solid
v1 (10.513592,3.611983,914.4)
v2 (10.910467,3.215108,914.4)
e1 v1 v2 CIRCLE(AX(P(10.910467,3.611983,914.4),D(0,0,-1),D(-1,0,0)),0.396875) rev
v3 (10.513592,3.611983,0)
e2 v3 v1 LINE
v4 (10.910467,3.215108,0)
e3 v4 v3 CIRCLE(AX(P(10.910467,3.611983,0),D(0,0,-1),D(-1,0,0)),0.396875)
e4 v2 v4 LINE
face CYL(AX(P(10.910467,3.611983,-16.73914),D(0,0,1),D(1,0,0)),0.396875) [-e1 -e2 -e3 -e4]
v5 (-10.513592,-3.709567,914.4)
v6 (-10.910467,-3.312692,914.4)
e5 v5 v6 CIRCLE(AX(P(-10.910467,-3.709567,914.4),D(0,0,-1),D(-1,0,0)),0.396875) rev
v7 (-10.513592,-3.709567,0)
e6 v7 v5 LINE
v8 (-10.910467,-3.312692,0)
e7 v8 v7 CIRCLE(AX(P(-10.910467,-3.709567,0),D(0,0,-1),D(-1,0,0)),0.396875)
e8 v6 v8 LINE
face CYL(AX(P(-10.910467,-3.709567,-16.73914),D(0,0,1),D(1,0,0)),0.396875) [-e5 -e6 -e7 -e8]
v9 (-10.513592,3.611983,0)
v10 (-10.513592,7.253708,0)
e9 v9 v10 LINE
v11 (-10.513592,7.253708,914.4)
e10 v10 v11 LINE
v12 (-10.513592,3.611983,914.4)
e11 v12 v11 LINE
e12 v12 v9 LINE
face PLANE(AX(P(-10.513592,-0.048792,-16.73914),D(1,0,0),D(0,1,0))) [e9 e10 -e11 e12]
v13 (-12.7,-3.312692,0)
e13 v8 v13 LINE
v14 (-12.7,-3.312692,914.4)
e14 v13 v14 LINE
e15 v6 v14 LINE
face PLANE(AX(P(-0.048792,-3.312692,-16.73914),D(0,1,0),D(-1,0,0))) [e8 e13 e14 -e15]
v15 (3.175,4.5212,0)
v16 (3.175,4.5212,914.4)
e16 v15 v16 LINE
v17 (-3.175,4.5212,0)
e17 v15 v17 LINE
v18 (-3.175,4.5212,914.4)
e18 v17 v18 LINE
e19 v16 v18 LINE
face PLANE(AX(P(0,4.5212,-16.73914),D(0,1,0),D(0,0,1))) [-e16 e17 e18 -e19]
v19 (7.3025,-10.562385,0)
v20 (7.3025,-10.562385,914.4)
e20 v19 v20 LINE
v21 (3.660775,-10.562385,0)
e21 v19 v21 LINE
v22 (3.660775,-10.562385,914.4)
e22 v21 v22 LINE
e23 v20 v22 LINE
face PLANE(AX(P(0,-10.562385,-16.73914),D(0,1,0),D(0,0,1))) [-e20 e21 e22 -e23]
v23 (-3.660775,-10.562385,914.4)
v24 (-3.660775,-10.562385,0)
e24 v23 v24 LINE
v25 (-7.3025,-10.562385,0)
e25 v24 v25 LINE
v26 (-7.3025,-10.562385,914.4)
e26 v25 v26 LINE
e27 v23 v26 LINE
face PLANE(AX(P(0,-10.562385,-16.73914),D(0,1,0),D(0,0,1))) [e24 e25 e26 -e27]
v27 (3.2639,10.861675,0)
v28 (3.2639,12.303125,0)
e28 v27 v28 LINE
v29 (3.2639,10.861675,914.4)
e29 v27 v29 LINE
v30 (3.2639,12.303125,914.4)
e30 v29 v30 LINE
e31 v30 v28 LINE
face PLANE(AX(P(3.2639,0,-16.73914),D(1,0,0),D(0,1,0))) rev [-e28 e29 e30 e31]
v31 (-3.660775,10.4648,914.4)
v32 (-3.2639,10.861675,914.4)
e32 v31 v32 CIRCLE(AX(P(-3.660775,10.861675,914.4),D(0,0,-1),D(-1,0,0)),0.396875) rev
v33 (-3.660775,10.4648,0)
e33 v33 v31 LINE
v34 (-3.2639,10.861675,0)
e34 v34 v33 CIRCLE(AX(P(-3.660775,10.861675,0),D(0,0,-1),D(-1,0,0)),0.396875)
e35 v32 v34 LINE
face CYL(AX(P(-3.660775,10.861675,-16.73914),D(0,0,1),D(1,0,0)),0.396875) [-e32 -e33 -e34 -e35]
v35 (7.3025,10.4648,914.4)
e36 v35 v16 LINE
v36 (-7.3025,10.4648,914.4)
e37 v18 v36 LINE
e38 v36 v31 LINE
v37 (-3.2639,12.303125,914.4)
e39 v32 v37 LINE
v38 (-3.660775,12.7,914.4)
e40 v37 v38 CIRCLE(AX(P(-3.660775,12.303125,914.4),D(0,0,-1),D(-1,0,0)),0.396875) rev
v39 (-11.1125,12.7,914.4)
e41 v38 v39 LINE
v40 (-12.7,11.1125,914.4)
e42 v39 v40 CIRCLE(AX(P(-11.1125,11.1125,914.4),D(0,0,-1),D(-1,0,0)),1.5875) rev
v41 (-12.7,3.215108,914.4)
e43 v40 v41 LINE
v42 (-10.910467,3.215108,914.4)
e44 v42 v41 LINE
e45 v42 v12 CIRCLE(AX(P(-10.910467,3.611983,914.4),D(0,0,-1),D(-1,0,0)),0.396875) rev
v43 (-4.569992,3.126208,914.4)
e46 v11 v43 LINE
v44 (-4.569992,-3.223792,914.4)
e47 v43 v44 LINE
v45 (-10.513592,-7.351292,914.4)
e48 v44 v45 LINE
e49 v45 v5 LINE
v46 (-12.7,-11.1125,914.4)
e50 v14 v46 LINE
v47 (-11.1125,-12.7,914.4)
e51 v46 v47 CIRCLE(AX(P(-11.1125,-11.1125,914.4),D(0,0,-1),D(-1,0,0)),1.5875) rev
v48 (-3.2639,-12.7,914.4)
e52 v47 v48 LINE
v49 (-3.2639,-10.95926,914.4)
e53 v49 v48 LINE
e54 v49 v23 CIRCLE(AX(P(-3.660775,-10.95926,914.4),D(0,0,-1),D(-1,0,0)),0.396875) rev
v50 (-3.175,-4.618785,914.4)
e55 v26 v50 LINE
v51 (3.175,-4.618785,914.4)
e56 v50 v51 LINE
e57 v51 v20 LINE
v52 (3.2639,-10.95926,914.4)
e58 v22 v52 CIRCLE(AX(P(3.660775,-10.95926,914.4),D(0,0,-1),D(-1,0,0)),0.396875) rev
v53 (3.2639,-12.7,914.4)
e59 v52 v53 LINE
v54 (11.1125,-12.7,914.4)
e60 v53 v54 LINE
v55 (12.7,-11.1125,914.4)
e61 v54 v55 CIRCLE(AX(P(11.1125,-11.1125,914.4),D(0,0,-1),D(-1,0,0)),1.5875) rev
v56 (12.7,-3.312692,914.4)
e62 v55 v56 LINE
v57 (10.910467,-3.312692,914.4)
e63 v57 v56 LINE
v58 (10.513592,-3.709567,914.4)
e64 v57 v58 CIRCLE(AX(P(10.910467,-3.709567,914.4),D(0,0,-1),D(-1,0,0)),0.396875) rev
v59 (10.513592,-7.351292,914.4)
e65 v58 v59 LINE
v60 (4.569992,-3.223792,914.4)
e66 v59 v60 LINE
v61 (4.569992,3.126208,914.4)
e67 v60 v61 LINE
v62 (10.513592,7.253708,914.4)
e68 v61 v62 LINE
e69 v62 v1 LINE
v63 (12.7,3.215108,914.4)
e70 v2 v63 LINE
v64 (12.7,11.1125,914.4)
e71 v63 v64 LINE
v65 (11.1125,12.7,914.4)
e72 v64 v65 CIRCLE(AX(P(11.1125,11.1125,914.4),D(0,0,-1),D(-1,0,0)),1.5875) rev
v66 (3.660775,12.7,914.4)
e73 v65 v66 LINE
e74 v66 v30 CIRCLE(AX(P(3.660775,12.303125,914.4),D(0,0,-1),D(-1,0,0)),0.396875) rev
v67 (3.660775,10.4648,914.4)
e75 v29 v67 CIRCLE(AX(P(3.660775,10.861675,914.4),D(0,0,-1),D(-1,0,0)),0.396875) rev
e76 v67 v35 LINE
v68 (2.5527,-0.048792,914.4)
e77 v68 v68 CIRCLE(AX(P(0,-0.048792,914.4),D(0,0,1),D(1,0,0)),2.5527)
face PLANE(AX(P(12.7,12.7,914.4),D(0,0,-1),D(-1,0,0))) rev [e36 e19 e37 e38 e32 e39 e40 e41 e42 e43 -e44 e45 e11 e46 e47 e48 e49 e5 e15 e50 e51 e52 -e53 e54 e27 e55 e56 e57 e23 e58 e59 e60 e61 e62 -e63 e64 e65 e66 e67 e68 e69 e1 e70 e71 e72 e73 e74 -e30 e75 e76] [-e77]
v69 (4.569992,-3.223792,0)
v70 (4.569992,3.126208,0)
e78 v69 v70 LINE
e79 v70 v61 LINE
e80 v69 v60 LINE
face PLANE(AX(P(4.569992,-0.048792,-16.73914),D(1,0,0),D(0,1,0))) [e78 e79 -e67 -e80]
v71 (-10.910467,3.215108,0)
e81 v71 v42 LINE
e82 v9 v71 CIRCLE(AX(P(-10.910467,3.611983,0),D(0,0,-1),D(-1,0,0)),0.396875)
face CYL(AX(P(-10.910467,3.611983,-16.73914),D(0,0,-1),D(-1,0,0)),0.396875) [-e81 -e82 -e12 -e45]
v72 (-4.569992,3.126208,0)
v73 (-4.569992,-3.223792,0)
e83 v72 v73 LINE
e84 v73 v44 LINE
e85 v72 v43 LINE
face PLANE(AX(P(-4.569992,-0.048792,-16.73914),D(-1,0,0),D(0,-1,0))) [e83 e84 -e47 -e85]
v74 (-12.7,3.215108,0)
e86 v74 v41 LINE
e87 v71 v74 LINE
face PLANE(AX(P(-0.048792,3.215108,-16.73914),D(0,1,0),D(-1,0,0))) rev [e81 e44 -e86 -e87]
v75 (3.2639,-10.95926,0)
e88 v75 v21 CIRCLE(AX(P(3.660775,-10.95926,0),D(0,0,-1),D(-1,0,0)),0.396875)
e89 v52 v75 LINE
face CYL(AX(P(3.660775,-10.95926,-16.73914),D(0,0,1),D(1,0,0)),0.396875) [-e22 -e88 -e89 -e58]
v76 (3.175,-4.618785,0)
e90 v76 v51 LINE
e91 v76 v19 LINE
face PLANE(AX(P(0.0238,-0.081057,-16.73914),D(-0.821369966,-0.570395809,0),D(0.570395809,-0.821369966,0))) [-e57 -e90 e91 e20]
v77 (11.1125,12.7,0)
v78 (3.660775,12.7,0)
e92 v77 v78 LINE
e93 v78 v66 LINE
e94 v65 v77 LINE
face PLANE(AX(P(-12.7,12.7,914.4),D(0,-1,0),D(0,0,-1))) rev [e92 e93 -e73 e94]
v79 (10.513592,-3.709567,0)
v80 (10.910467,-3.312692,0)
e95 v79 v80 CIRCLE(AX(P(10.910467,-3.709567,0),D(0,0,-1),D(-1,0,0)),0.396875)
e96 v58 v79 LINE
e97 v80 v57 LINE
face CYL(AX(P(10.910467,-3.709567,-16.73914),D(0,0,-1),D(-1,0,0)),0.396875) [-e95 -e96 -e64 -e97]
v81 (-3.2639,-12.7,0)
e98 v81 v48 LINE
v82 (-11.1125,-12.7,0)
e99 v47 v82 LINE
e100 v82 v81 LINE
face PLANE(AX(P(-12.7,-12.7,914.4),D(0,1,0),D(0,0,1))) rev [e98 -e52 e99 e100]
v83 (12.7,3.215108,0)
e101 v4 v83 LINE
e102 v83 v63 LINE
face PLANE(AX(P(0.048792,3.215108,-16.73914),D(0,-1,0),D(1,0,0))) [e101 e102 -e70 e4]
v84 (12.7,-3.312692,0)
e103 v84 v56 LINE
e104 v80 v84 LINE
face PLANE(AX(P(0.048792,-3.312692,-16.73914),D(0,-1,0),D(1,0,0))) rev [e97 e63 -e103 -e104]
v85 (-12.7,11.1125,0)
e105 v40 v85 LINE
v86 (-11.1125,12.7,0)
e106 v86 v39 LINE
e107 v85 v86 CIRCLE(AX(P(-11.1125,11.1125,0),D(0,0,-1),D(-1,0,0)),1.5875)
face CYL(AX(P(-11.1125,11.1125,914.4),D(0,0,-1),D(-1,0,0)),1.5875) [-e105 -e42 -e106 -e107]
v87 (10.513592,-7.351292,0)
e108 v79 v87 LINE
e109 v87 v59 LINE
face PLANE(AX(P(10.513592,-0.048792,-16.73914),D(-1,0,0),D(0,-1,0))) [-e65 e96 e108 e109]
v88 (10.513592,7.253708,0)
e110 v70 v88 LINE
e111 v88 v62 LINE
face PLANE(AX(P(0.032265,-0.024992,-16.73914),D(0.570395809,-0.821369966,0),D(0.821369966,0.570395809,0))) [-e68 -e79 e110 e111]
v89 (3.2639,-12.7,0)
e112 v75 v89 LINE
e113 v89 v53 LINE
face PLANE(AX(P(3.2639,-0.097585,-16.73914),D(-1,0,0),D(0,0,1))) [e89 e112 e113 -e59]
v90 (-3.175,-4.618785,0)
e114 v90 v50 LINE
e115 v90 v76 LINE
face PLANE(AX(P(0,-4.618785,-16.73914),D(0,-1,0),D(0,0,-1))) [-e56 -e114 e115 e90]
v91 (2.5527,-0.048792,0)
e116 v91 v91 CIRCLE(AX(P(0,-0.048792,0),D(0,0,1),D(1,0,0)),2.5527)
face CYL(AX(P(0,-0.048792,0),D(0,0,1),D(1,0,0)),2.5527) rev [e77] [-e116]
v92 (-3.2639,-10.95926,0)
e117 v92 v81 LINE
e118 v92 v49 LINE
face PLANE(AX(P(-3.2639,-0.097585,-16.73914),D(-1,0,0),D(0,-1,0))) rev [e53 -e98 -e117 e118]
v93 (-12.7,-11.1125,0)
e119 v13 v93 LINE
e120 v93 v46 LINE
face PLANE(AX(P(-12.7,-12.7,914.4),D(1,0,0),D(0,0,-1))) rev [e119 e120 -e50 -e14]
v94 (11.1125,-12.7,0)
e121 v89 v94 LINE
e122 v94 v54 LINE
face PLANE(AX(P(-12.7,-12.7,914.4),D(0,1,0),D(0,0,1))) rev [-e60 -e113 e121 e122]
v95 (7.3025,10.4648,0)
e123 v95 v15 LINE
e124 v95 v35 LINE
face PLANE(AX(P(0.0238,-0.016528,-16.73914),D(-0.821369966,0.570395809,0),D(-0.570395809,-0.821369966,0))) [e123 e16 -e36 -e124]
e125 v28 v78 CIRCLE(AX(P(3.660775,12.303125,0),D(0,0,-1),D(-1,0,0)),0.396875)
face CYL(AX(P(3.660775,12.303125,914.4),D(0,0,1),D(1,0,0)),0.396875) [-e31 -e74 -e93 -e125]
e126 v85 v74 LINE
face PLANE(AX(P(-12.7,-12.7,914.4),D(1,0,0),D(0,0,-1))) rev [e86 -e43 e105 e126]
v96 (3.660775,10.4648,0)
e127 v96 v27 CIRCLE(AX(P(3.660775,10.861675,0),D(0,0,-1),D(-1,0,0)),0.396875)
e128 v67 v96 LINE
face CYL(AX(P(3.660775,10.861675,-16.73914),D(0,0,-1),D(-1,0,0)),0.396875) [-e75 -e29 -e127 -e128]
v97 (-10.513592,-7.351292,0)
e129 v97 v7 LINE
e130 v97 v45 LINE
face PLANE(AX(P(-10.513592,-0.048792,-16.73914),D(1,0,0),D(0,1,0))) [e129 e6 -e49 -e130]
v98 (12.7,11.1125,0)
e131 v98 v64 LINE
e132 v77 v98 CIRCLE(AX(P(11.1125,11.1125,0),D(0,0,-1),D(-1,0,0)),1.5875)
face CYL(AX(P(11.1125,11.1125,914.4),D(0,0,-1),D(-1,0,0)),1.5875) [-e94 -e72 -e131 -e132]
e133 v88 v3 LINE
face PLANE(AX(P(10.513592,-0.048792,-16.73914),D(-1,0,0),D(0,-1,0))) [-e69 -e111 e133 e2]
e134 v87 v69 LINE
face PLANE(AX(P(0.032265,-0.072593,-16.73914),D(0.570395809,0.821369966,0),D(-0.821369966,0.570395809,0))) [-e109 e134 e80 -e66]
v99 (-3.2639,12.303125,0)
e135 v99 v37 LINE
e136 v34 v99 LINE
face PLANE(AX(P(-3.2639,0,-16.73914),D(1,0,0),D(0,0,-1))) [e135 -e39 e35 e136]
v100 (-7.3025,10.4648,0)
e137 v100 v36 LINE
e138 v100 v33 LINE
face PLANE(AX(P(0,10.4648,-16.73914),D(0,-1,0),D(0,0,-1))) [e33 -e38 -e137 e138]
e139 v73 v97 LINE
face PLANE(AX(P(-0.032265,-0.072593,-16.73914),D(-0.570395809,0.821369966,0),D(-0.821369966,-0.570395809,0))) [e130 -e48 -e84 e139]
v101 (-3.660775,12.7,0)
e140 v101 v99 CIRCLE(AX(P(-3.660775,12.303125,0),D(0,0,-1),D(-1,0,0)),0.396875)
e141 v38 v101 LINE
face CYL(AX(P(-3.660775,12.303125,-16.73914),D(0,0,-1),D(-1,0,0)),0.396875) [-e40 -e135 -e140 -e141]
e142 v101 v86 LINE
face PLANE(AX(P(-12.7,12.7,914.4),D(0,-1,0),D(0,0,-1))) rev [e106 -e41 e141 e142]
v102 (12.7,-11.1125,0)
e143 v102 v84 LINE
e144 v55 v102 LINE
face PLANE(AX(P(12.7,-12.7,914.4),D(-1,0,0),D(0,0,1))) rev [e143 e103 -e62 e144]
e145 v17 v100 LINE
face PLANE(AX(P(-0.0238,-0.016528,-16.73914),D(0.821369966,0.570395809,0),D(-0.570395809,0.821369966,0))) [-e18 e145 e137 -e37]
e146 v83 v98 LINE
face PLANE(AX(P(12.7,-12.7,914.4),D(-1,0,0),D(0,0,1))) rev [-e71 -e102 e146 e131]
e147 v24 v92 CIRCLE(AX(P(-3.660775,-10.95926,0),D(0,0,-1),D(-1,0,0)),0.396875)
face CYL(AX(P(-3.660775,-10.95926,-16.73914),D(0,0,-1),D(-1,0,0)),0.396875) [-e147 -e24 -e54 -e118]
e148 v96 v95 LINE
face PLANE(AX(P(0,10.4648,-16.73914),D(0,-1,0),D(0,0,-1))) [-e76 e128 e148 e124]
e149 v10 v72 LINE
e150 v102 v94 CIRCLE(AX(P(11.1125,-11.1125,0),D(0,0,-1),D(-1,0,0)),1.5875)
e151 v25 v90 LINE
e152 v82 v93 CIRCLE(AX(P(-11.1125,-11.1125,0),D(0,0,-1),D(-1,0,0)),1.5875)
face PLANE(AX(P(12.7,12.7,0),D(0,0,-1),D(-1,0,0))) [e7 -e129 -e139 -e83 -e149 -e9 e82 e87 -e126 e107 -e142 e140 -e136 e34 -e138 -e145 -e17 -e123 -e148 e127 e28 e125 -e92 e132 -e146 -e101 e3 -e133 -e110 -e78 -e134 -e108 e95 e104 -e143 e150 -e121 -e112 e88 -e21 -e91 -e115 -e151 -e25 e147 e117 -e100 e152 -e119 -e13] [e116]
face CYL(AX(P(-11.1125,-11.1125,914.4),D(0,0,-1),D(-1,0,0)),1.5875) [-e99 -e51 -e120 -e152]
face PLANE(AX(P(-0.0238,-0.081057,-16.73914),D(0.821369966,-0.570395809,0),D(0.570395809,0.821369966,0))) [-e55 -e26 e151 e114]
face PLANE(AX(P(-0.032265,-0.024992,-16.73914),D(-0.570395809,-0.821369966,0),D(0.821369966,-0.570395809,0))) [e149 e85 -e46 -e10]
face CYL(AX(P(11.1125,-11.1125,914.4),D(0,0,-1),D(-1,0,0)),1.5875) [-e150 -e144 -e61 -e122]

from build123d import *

# Parameters (mm, degrees)
SKETCH1_W           = 25.4
SKETCH1_H           = 25.4
BOSS_EXTRUDE1_DEPTH = 914.4
FILLET1_R           = 1.5875
HOLE1_OUTLINE_R     = 2.5527
HOLE1_DEPTH         = 914.4
SKETCH7_W           = 6.5278
SKETCH7_H           = 2.2352
CUT_EXTRUDE2_DEPTH  = 914.4
FILLET4_R           = 0.396875
CIRPATTERN2_DEPTH   = 914.4


# Read off the part's stored shape, not the designer's step: Hole1, CirPattern2
with BuildPart() as part:
    # Sketch1 → Boss-Extrude1 (new body)
    with BuildSketch(Plane.XY):
        Rectangle(SKETCH1_W, SKETCH1_H)
    extrude(amount=BOSS_EXTRUDE1_DEPTH)

    # Fillet1
    fillet1_edges = [part.edges().sort_by_distance(p)[0] for p in [
        (12.7, -12.7, 457.2),
        (-12.7, -12.7, 457.2),
        (-12.7, 12.7, 457.2),
        (12.7, 12.7, 457.2),
    ]]
    fillet(fillet1_edges, radius=FILLET1_R)

    # Hole1 outline → Hole1 (cut)
    with BuildSketch(Plane.XY):
        with Locations((0, -0.048792482)):
            Circle(HOLE1_OUTLINE_R)
    extrude(amount=HOLE1_DEPTH, mode=Mode.SUBTRACT)

    # Sketch7 → Cut-Extrude2 (cut)
    with BuildSketch(Plane.XY.offset(914.4)):
        with Locations((0, 11.5824)):
            Rectangle(SKETCH7_W, SKETCH7_H)
        Polygon((-3.175, 4.5212), (-7.3025, 10.4648), (7.3025, 10.4648), (3.175, 4.5212), align=None)
    extrude(amount=-CUT_EXTRUDE2_DEPTH, mode=Mode.SUBTRACT)

    # Fillet4
    fillet4_edges = [part.edges().sort_by_distance(p)[0] for p in [
        (-3.2639, 10.4648, 457.2),
        (-3.2639, 12.7, 457.2),
        (3.2639, 12.7, 457.2),
        (3.2639, 10.4648, 457.2),
    ]]
    fillet(fillet4_edges, radius=FILLET4_R)

    # CirPattern2 outline → CirPattern2 (cut)
    with BuildSketch(Plane.XY):
        with BuildLine():
            ThreePointArc((-3.660775, -10.562384964), (-3.380141996, -10.67862696), (-3.2639, -10.959259964))
            Line((-3.2639, -10.959259964), (-3.2639, -12.7))
            Line((-3.2639, -12.7), (3.2639, -12.7))
            Line((3.2639, -12.7), (3.2639, -10.959259964))
            ThreePointArc((3.2639, -10.959259964), (3.380141996, -10.67862696), (3.660775, -10.562384964))
            Line((3.660775, -10.562384964), (7.3025, -10.562384964))
            Line((7.3025, -10.562384964), (3.175, -4.618784964))
            Line((3.175, -4.618784964), (-3.175, -4.618784964))
            Line((-3.175, -4.618784964), (-7.3025, -10.562384964))
            Line((-7.3025, -10.562384964), (-3.660775, -10.562384964))
        make_face()
        with BuildLine():
            Line((-12.7, -3.312692482), (-10.910467482, -3.312692482))
            ThreePointArc((-10.910467482, -3.312692482), (-10.629834478, -3.428934478), (-10.513592482, -3.709567482))
            Line((-10.513592482, -3.709567482), (-10.513592482, -7.351292482))
            Line((-10.513592482, -7.351292482), (-4.569992482, -3.223792482))
            Line((-4.569992482, -3.223792482), (-4.569992482, 3.126207518))
            Line((-4.569992482, 3.126207518), (-10.513592482, 7.253707518))
            Line((-10.513592482, 7.253707518), (-10.513592482, 3.611982518))
            ThreePointArc((-10.513592482, 3.611982518), (-10.629834478, 3.331349514), (-10.910467482, 3.215107518))
            Line((-10.910467482, 3.215107518), (-12.7, 3.215107518))
            Line((-12.7, 3.215107518), (-12.7, -3.312692482))
        make_face()
        with BuildLine():
            ThreePointArc((10.513592482, -3.709567482), (10.629834478, -3.428934478), (10.910467482, -3.312692482))
            Line((10.910467482, -3.312692482), (12.7, -3.312692482))
            Line((12.7, -3.312692482), (12.7, 3.215107518))
            Line((12.7, 3.215107518), (10.910467482, 3.215107518))
            ThreePointArc((10.910467482, 3.215107518), (10.629834478, 3.331349514), (10.513592482, 3.611982518))
            Line((10.513592482, 3.611982518), (10.513592482, 7.253707518))
            Line((10.513592482, 7.253707518), (4.569992482, 3.126207518))
            Line((4.569992482, 3.126207518), (4.569992482, -3.223792482))
            Line((4.569992482, -3.223792482), (10.513592482, -7.351292482))
            Line((10.513592482, -7.351292482), (10.513592482, -3.709567482))
        make_face()
    extrude(amount=CIRPATTERN2_DEPTH, mode=Mode.SUBTRACT)


solid = part.part
